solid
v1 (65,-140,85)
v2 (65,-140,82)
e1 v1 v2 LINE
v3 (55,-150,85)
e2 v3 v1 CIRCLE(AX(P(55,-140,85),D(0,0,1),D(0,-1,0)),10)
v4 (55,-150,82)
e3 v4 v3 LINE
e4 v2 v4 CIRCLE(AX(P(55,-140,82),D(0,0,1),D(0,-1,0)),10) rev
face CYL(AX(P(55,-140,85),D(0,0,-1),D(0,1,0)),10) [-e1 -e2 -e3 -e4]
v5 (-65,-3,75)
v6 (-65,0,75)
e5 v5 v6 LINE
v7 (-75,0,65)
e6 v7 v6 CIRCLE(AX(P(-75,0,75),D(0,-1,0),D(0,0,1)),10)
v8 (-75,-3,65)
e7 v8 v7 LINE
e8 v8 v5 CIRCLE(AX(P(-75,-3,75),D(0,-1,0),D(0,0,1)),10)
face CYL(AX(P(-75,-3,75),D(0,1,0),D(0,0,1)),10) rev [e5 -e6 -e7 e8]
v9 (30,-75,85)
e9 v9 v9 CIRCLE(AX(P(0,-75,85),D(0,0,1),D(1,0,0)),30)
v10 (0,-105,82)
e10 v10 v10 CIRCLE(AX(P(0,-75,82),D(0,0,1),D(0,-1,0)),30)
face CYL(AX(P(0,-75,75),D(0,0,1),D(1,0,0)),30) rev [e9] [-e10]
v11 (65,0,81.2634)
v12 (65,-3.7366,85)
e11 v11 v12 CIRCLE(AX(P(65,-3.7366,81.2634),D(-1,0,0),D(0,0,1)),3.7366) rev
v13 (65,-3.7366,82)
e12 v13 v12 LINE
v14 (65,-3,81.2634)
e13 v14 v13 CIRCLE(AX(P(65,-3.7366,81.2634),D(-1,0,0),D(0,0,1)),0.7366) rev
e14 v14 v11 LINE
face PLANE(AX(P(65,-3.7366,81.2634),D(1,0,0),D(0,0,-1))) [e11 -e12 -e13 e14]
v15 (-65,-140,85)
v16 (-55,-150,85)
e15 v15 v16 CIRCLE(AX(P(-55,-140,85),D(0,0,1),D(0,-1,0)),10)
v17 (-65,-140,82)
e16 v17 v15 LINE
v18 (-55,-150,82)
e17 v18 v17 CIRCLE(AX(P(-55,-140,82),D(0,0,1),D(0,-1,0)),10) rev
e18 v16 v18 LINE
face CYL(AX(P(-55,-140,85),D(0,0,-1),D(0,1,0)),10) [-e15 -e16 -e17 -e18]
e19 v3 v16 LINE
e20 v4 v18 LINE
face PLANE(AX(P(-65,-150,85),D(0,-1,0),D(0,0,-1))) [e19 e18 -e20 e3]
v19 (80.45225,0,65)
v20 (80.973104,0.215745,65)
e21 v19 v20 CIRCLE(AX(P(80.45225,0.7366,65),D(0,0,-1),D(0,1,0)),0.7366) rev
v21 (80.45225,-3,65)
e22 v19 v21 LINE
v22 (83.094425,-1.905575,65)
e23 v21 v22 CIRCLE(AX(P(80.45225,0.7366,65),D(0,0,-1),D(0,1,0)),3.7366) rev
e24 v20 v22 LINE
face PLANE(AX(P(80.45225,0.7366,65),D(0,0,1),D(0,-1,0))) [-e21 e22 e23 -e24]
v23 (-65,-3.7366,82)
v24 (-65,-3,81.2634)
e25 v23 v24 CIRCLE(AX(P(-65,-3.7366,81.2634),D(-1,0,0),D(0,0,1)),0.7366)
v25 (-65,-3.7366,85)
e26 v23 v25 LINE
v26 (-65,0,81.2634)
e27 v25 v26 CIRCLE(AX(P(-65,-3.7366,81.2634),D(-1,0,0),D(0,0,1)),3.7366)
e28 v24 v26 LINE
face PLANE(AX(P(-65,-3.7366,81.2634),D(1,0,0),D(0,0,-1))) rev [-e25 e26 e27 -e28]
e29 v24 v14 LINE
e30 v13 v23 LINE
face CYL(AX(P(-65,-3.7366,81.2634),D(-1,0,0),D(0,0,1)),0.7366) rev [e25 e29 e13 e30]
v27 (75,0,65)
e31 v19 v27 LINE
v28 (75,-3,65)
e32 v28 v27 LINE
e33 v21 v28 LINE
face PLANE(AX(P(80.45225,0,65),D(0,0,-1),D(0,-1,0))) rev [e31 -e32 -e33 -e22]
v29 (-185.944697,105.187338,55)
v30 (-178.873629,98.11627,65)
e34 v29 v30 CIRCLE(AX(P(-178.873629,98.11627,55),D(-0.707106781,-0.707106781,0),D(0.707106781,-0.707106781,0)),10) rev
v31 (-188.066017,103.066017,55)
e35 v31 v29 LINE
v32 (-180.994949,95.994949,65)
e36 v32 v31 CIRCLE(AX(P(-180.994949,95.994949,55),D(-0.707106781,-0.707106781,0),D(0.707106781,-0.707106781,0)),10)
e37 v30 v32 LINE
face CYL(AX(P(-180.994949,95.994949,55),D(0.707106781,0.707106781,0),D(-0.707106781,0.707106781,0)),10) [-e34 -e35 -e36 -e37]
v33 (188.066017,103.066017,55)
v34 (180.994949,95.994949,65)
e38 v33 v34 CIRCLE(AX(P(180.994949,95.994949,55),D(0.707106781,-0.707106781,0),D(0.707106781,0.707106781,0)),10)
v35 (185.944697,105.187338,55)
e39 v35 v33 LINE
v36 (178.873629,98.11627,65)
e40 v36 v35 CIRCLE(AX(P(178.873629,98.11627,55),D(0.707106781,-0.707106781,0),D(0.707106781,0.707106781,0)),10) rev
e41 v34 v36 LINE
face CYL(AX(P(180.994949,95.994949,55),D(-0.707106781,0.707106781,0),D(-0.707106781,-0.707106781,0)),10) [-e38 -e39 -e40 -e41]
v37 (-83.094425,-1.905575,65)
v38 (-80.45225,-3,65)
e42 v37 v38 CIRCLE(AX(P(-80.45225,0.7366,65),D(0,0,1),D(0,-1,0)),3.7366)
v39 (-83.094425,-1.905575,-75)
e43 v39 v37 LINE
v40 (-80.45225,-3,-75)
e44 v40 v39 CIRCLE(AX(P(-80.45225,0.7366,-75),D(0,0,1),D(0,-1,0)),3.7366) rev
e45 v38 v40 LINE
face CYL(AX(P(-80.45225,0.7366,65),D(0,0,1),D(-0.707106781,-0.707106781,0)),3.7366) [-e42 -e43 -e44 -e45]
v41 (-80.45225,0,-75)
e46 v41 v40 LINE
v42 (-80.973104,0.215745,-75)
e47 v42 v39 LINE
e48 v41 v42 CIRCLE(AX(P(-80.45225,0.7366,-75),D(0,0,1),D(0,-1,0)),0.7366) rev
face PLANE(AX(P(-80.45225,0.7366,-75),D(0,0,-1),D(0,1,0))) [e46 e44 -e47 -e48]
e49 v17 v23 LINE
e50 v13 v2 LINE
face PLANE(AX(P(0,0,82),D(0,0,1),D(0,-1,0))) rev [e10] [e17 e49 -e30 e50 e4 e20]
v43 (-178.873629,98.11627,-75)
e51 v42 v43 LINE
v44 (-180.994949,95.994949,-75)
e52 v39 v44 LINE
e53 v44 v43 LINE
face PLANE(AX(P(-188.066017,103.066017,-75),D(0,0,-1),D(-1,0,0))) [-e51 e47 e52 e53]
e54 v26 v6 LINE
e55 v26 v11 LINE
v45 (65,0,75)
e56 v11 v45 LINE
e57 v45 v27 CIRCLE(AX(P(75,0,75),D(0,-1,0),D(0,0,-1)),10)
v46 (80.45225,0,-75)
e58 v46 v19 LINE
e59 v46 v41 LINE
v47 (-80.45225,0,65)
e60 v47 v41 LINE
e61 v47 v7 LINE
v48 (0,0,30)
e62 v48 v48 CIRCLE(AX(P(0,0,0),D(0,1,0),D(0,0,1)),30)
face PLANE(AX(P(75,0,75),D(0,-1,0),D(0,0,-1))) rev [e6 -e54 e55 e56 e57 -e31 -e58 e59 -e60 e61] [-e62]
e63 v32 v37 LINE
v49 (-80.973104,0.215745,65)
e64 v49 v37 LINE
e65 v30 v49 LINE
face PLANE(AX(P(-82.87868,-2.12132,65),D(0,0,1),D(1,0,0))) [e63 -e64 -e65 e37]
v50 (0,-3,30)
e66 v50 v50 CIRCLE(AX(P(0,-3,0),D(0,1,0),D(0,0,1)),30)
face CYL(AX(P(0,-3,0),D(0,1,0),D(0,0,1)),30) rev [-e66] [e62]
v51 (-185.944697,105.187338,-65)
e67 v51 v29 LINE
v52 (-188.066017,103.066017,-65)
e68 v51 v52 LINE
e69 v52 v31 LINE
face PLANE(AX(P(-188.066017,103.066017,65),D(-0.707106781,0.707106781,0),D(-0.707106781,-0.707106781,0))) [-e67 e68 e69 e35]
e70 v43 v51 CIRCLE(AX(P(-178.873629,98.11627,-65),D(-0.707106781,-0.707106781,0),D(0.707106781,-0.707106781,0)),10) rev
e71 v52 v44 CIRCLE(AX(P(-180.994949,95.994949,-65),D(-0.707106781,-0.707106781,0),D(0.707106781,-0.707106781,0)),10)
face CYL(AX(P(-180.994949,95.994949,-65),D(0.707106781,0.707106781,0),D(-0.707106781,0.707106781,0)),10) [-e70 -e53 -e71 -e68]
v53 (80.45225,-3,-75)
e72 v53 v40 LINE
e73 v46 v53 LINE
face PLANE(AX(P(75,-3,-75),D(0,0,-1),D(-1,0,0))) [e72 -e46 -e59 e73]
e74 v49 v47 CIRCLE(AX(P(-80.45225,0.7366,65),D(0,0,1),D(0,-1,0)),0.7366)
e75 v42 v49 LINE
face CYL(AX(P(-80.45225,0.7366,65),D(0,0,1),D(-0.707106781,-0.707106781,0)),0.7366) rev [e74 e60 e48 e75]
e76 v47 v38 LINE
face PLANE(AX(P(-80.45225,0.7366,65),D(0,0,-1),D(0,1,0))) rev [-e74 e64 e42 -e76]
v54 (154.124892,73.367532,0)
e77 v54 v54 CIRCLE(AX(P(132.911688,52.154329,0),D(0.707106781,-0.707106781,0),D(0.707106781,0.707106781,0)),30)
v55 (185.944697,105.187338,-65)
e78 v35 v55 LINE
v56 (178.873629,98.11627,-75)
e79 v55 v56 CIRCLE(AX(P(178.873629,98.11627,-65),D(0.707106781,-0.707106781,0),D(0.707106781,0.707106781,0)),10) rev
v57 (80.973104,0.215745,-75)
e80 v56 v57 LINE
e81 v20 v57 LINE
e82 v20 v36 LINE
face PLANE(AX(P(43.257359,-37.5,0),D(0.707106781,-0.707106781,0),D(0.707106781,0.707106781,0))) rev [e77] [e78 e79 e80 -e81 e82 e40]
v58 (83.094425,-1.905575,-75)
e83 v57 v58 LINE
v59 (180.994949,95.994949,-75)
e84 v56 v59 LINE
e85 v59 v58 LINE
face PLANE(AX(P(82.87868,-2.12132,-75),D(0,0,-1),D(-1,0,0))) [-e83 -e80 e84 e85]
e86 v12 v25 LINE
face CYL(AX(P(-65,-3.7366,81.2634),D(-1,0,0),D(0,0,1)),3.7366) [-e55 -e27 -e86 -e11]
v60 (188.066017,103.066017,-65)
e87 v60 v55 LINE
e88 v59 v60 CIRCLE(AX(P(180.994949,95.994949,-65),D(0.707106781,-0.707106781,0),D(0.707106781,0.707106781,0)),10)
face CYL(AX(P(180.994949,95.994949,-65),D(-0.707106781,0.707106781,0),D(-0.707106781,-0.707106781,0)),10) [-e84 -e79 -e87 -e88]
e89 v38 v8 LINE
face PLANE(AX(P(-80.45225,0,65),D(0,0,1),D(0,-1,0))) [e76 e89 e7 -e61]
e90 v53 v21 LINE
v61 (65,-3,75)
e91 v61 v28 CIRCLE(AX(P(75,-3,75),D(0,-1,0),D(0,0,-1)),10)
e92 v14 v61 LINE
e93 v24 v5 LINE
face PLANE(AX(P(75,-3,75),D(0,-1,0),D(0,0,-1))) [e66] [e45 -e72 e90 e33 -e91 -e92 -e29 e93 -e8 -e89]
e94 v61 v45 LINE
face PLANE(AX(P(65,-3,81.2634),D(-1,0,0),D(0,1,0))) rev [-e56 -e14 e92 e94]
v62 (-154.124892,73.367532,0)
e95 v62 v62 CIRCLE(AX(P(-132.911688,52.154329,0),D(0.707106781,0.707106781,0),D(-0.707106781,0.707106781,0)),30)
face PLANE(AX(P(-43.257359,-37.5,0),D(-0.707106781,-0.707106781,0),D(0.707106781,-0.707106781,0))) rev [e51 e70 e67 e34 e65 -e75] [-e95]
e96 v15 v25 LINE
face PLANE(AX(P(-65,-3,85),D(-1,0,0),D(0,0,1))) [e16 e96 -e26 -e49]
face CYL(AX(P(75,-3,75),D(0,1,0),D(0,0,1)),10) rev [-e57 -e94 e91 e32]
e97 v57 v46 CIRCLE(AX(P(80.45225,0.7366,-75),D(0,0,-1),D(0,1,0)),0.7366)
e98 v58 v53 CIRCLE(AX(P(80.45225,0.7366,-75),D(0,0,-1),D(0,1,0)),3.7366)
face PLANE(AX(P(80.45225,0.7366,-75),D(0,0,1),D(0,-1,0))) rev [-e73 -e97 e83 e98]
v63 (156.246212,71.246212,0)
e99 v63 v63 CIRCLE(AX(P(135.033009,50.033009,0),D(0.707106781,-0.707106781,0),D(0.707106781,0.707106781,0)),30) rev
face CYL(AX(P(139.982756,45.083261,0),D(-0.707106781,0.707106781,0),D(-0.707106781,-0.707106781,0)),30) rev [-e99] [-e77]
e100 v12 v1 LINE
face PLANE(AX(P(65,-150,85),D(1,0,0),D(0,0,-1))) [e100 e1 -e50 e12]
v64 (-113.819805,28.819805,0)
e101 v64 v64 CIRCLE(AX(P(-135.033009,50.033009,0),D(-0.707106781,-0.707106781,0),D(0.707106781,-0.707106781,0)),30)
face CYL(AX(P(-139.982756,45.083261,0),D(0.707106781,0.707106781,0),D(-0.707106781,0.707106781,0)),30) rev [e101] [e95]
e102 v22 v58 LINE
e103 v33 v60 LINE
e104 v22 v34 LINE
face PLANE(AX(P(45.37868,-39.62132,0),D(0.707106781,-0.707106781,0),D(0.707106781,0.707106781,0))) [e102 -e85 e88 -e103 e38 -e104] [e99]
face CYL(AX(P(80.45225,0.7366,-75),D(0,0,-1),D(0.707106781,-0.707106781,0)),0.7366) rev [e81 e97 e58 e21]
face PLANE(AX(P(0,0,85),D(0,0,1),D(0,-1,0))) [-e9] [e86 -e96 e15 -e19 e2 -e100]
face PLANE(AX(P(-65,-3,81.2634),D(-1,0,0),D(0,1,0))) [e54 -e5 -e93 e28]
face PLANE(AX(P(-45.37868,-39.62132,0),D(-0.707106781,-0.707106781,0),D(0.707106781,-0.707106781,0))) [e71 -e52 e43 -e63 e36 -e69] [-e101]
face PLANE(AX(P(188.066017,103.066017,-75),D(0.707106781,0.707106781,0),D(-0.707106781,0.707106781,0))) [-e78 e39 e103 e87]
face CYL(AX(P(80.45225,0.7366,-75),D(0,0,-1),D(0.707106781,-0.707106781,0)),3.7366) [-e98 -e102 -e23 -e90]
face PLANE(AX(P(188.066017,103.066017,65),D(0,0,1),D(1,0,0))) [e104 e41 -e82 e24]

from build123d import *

# Parameters (mm, degrees)
SKETCH1_R          = 30
BASE_FLANGE1_DEPTH = 3
EDGE_FLANGE1_START = -75
EDGE_FLANGE1_DEPTH = 140
EDGE_FLANGE2_START = -75
EDGE_FLANGE2_DEPTH = 140
EDGE_FLANGE3_DEPTH = 130
SKETCH23_R         = 30
CUT_EXTRUDE1_DEPTH = 10
SKETCH24_R         = 30
CUT_EXTRUDE2_DEPTH = 10
FILLET1_R          = 10


# Read off the part's stored shape, not the designer's step: Edge-Flange1, Edge-Flange2
# Sheet-metal steps are written as plain solids
with BuildPart() as part:
    # Sketch1 → Base-Flange1 (new body)
    with BuildSketch(Plane(origin=(0, 0, 0), x_dir=(1, 0, 0), z_dir=(0, 1, 0))):
        with BuildLine():
            Line((65, -75), (-65, -75))
            ThreePointArc((-65, -75), (-67.928932188, -67.928932188), (-75, -65))
            Line((-75, -65), (-75, 75))
            Line((-75, 75), (75, 75))
            Line((75, 75), (75, -65))
            ThreePointArc((75, -65), (67.928932188, -67.928932188), (65, -75))
        make_face()
        with Locations(Location((0, 0, 0), (0, 0, 270))):
            Circle(SKETCH1_R, mode=Mode.SUBTRACT)
    extrude(amount=-BASE_FLANGE1_DEPTH)

    # Edge-Flange1 outline → Edge-Flange1 (add)
    with BuildSketch(Plane.XY.offset(EDGE_FLANGE1_START)):
        with BuildLine():
            Line((-188.066017178, 103.066017178), (-83.094424801, -1.905575199))
            ThreePointArc((-83.094424801, -1.905575199), (-81.882184516, -2.715568261), (-80.452249603, -3))
            Line((-80.452249603, -3), (-75, -3))
            Line((-75, -3), (-75, 0))
            Line((-75, 0), (-80.452249603, 0))
            ThreePointArc((-80.452249603, 0), (-80.734134219, 0.056070336), (-80.973104458, 0.215745145))
            Line((-80.973104458, 0.215745145), (-185.944696834, 105.187337522))
            Line((-185.944696834, 105.187337522), (-188.066017178, 103.066017178))
        make_face()
    extrude(amount=EDGE_FLANGE1_DEPTH)

    # Edge-Flange2 outline → Edge-Flange2 (add)
    with BuildSketch(Plane.XY.offset(EDGE_FLANGE2_START)):
        with BuildLine():
            ThreePointArc((80.452249603, -3), (81.882184516, -2.715568261), (83.094424801, -1.905575199))
            Line((83.094424801, -1.905575199), (188.066017178, 103.066017178))
            Line((188.066017178, 103.066017178), (185.944696834, 105.187337522))
            Line((185.944696834, 105.187337522), (80.973104458, 0.215745145))
            ThreePointArc((80.973104458, 0.215745145), (80.734134219, 0.056070336), (80.452249603, 0))
            Line((80.452249603, 0), (75, 0))
            Line((75, 0), (75, -3))
            Line((75, -3), (80.452249603, -3))
        make_face()
    extrude(amount=EDGE_FLANGE2_DEPTH)

    # Edge-Flange3 section (across the edge) → Edge-Flange3 (add)
    with BuildSketch(Plane(origin=(65, -3, 85), x_dir=(0, 0, -1), z_dir=(-1, 0, 0))):
        with BuildLine():
            Line((0, 0.7366), (0, 147))
            Line((0, 147), (3, 147))
            Line((3, 147), (3, 0.7366))
            ThreePointArc((3, 0.7366), (3.215745145, 0.215745145), (3.7366, 0))
            Line((3.7366, 0), (10, 0))
            Line((10, 0), (10, -3))
            Line((10, -3), (3.7366, -3))
            ThreePointArc((3.7366, -3), (1.094424801, -1.905575199), (0, 0.7366))
        make_face()
    extrude(amount=EDGE_FLANGE3_DEPTH)

    # Sketch23 → Cut-Extrude1 (cut)
    with BuildSketch(Plane(origin=(-40.378679656, -40.378679656, 0), x_dir=(0, 0, -1), z_dir=(0.7071067811865438, 0.7071067811865513, 0))):
        with Locations(Location((0, 130.861435714, 0), (0, 0, 90))):
            Circle(SKETCH23_R)
    cut_extrude1 = extrude(amount=-CUT_EXTRUDE1_DEPTH, mode=Mode.SUBTRACT)

    # Mirror1: Cut-Extrude1 across plane
    add(cut_extrude1.mirror(Plane(origin=(0, 0, 0), x_dir=(0, 0, 1), z_dir=(1, 0, 0))), mode=Mode.SUBTRACT)

    # Sketch24 → Cut-Extrude2 (cut)
    with BuildSketch(Plane.XY.offset(85)):
        with Locations((0, -75)):
            Circle(SKETCH24_R)
    extrude(amount=-CUT_EXTRUDE2_DEPTH, mode=Mode.SUBTRACT)

    # Fillet1
    fillet1_edges = [part.edges().sort_by_distance(p)[0] for p in [
        (-187.005357006, 104.12667735, -75),
        (-187.005357006, 104.12667735, 65),
        (187.005357006, 104.12667735, 65),
        (187.005357006, 104.12667735, -75),
        (65, -150, 83.5),
        (-65, -150, 83.5),
    ]]
    fillet(fillet1_edges, radius=FILLET1_R)


solid = part.part
